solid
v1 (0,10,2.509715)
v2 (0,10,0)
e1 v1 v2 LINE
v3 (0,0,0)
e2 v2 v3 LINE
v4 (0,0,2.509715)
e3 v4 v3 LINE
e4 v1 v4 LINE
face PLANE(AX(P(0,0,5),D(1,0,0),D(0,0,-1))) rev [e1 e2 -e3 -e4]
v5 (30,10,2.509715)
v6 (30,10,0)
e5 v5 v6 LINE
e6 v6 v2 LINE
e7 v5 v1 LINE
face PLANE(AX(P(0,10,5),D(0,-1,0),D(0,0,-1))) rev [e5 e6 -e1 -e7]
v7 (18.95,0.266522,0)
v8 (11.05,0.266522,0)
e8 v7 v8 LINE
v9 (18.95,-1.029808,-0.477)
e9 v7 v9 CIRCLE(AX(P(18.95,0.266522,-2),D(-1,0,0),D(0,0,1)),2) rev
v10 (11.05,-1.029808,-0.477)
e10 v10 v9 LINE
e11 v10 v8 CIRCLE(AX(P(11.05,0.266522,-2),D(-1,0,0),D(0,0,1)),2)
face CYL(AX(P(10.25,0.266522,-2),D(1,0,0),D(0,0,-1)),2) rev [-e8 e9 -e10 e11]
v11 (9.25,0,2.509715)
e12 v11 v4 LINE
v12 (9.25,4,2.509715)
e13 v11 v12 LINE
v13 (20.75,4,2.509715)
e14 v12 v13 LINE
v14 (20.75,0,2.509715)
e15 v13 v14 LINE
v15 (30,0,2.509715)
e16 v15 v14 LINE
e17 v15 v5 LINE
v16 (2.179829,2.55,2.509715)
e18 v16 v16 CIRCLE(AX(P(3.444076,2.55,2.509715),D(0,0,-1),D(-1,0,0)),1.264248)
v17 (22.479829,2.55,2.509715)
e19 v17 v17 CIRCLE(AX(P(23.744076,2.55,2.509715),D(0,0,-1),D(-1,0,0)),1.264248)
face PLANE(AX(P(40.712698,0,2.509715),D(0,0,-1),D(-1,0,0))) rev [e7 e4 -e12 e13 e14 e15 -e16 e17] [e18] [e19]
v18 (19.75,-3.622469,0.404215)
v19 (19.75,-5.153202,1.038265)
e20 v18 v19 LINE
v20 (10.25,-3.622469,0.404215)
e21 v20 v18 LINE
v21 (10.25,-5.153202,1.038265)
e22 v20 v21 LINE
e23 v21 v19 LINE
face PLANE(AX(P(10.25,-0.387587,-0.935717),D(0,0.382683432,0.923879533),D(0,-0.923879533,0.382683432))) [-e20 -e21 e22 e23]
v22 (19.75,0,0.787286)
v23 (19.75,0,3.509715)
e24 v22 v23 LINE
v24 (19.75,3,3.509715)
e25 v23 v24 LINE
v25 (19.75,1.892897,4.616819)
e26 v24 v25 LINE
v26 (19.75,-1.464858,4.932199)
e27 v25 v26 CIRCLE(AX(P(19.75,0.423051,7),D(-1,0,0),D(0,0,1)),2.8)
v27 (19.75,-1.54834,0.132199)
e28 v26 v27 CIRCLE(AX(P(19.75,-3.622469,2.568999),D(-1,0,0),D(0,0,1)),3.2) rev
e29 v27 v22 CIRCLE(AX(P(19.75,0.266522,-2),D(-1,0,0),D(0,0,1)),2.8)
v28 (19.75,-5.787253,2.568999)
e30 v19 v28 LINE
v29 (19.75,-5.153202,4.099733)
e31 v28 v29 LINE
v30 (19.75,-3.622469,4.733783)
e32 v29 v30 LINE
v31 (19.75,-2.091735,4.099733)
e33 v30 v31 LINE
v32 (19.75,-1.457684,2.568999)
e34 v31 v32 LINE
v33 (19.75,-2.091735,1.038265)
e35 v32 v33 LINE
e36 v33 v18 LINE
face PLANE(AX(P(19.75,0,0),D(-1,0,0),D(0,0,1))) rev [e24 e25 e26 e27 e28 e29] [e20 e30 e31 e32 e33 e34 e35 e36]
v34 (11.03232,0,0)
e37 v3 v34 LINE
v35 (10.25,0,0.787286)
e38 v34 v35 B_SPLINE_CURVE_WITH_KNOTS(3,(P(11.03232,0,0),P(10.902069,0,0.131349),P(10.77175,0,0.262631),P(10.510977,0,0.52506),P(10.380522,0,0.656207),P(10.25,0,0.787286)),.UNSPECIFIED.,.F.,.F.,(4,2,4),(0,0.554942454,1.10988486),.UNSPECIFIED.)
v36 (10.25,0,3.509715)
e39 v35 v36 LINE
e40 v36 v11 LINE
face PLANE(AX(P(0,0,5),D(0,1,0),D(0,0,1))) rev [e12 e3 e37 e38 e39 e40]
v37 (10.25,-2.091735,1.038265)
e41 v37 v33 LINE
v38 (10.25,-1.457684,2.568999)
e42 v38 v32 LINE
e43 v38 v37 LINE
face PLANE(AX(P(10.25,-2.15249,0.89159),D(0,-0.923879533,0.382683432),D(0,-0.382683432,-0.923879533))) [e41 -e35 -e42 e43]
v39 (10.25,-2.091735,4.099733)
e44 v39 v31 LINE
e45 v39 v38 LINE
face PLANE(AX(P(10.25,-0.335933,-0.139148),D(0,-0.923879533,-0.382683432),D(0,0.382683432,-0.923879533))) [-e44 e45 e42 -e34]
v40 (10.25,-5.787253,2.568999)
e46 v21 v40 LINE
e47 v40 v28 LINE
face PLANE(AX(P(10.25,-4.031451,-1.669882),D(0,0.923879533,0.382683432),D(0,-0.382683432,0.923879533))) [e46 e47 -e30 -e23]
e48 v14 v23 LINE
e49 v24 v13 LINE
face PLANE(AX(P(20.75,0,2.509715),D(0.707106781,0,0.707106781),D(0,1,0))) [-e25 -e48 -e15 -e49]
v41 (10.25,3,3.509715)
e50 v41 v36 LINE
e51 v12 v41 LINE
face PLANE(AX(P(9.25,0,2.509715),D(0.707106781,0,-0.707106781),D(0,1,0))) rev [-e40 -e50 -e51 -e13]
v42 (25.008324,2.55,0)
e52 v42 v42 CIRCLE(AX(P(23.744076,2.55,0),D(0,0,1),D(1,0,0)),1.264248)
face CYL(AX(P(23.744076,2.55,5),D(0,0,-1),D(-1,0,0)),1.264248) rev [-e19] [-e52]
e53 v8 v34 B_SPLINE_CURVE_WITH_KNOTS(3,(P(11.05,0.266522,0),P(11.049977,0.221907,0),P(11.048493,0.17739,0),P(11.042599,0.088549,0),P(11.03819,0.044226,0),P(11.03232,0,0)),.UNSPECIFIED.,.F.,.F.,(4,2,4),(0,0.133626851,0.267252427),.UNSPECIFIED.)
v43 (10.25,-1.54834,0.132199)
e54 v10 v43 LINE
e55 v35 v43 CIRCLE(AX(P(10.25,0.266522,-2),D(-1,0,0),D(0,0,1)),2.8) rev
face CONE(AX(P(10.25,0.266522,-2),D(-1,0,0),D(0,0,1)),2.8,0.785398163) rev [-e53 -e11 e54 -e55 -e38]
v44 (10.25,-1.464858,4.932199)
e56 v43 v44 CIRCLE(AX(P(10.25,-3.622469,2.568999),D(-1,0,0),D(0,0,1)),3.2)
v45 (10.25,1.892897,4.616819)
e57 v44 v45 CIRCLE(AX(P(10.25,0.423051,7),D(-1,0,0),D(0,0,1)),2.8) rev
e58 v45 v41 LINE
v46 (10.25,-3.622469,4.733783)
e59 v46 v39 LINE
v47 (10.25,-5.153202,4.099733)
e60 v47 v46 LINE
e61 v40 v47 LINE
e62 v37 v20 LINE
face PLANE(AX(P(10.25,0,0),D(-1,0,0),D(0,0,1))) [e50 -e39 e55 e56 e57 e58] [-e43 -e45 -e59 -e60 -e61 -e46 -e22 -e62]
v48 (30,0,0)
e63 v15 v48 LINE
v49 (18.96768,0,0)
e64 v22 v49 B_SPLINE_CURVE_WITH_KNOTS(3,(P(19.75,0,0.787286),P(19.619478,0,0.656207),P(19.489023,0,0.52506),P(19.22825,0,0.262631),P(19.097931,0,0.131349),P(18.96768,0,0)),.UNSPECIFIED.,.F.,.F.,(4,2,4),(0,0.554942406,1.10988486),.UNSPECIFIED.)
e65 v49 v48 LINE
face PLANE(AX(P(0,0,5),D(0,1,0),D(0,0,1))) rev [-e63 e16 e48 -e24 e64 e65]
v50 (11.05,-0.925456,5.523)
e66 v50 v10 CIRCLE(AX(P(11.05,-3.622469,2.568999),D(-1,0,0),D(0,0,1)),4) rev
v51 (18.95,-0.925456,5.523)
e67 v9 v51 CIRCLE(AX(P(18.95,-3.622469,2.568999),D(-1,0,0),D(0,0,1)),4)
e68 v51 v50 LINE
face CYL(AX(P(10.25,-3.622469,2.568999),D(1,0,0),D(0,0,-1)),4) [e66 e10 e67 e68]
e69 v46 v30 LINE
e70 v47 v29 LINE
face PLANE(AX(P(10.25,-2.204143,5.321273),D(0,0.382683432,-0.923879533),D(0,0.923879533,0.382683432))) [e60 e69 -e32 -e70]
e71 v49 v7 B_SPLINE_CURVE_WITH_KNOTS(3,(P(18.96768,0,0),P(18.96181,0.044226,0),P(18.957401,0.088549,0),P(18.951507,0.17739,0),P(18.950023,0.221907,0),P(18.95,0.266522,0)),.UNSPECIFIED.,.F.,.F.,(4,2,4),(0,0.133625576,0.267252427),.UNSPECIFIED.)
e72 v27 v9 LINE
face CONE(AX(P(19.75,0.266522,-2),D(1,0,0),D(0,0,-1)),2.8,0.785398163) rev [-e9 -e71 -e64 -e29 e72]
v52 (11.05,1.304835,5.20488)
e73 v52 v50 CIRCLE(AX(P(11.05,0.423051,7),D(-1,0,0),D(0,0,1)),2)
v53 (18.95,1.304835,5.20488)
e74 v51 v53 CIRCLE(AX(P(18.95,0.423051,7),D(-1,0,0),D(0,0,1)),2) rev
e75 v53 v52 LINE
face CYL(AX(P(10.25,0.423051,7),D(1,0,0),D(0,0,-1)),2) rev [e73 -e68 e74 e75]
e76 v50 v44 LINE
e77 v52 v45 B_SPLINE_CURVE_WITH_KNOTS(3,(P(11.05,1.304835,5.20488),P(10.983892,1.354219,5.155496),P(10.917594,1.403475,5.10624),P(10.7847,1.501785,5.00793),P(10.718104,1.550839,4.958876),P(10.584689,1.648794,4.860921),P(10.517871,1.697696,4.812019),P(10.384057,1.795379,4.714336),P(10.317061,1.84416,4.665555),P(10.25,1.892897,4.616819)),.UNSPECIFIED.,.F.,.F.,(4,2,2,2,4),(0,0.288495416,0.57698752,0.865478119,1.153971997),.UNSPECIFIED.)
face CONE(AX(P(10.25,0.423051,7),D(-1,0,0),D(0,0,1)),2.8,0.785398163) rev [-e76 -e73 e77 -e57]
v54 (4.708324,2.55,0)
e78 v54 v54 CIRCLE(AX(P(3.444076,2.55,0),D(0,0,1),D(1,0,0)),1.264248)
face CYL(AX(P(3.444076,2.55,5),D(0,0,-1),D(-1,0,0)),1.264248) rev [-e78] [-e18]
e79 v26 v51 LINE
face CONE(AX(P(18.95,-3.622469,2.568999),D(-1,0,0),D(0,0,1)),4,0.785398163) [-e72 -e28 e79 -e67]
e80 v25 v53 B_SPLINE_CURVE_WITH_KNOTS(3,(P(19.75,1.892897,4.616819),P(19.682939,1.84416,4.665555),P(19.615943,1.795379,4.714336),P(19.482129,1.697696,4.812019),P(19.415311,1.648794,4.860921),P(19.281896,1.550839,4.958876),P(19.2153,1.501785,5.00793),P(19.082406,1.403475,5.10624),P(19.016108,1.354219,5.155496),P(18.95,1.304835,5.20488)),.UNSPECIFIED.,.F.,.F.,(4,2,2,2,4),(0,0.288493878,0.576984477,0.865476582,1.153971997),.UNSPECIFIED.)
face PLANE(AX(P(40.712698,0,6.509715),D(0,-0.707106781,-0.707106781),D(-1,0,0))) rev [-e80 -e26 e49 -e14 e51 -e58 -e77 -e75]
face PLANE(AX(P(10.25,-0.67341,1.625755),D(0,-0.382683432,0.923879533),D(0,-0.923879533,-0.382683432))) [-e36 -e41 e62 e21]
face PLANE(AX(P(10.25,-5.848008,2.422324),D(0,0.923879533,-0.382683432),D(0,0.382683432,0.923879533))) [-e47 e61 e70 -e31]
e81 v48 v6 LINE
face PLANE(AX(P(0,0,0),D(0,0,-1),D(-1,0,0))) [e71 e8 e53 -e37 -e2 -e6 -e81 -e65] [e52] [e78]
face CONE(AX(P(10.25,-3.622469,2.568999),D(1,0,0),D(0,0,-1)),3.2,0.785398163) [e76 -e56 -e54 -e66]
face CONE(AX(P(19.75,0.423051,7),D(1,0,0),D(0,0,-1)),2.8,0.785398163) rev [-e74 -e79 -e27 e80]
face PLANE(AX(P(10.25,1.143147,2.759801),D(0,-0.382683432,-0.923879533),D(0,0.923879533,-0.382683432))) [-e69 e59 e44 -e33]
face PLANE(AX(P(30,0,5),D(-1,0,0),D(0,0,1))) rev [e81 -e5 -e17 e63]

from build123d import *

# Parameters (mm, degrees)
SKETCH1_W           = 30
SKETCH1_H           = 10
SKETCH1_R           = 1.264247842
BOSS_EXTRUDE1_DEPTH = 5
SKETCH3_R           = 4
BOSS_EXTRUDE2_DEPTH = 4.75
FILLET1_R           = 2
FILLET2_R           = 2
CHAMFER1_SIZE       = 0.8
CUT_EXTRUDE3_REACH  = 34.298
SKETCH6_W           = 3.842122027
SKETCH6_H           = 10
CHAMFER4_START      = 10.25
CHAMFER4_DEPTH      = 9.5
CHAMFER5_SIZE       = 1


with BuildPart() as part:
    # Sketch1 → Boss-Extrude1 (new body)
    with BuildSketch(Plane.XY):
        with Locations((15, 5)):
            Rectangle(SKETCH1_W, SKETCH1_H)
        with Locations((3.444076375, 2.55)):
            Circle(SKETCH1_R, mode=Mode.SUBTRACT)
        with Locations((23.744076375, 2.55)):
            Circle(SKETCH1_R, mode=Mode.SUBTRACT)
    extrude(amount=BOSS_EXTRUDE1_DEPTH)

    # Sketch3 → Boss-Extrude2 (add, symmetric)
    with BuildSketch(Plane.ZY.offset(-15)):
        with Locations((2.568998912, -3.622468738)):
            Circle(SKETCH3_R)
        Polygon((0.404214511, -3.622468738), (1.038265182, -5.153202468), (2.568998912, -5.787253139), (4.099732641, -5.153202468), (4.733783312, -3.622468738), (4.099732641, -2.091735009), (2.568998912, -1.457684338), (1.038265182, -2.091735009), align=None, mode=Mode.SUBTRACT)
    extrude(amount=BOSS_EXTRUDE2_DEPTH, both=True)

    # Fillet1
    # the kernel refuses this fillet: 2 mm, written as the material it adds along each edge
    with BuildSketch(Plane(origin=(19.75, 0, 0.872614451), x_dir=(0, 0, -1), z_dir=(-1, 0, 0))) as fillet1_piece_1:
        with BuildLine():
            CenterArc((2.851261839, -0.291469576), FILLET1_R, 139.283020083, 32.337148469)
            ThreePointArc((1.335379739, 1.013176529), (0.721358104, 0.435852839), (0, 0))
            Line((0, 0), (0.872614451, 0))
        make_face()
    extrude(amount=9.5)
    with BuildSketch(Plane(origin=(19.75, 0, 4.265383373), x_dir=(0, 0, 1), z_dir=(-1, 0, 0))) as fillet1_piece_2:
        with BuildLine():
            CenterArc((2.674069858, 0.488386288), FILLET1_R, 194.13415607, 29.112659272)
            ThreePointArc((1.217251752, -0.881898721), (0.650423795, -0.383257259), (0, 0))
            Line((0, 0), (0.734616627, 0))
        make_face()
    extrude(amount=9.5)

    # Fillet2
    # the kernel refuses this fillet: 2 mm, written as the material it adds along each edge
    with BuildSketch(Plane(origin=(19.75, 0, 0), x_dir=(0, 1, 0), z_dir=(-1, 0, 0))) as fillet2_piece_1:
        with BuildLine():
            CenterArc((0.266521997, 2), FILLET2_R, 229.596597584, 40.403402416)
            Line((-1.029808248, 0.477000363), (-1.159441272, 0.324700399))
            ThreePointArc((-1.159441272, 0.324700399), (-1.143641139, 0.311177078), (-0.029146958, -0.197864739))
            Line((-0.029146958, -0.197864739), (0, -0.2))
            Line((0, -0.2), (0.266521997, -0.2))
            Line((0.266521997, -0.2), (0.266521997, 0))
        make_face()
    extrude(amount=9.5)
    with BuildSketch(Plane(origin=(19.75, 0, 5), x_dir=(0, -0.870596677984774, 0.491997382393317), z_dir=(-1, 0, 0))) as fillet2_piece_2:
        with BuildLine():
            CenterArc((0.615688034, 1.949333304), FILLET2_R, 240.528051524, 42.396189725)
            Line((-0.368306731, 0.208139948), (-0.466706207, 0.034020613))
            Line((-0.466706207, 0.034020613), (-0.098399476, -0.174119336))
            Line((-0.098399476, -0.174119336), (-0.052901843, -0.192876631))
            ThreePointArc((-0.052901843, -0.192876631), (1.052854803, -0.20795909), (1.10774555, -0.19493333))
            Line((1.10774555, -0.19493333), (1.063013048, 0))
        make_face()
    extrude(amount=9.5)

    # Chamfer1
    # the kernel refuses this chamfer: 0.8 mm, written as the material it takes off along each edge
    with BuildSketch(Plane(origin=(19.75, 0.266521997, -2), x_dir=(0, -0.648165122631187, 0.7614998186503384), z_dir=(0, -0.7614998186503384, -0.648165122631187))) as chamfer1_piece_1_section:
        Polygon((2, CHAMFER1_SIZE), (2 + CHAMFER1_SIZE, 0), (2, 0), align=None)
    chamfer1_piece_1 = revolve(axis=Axis((19.75, 0.266521997, -2), (-1, 0, 0)), revolution_arc=99.346805501, mode=Mode.PRIVATE)
    chamfer1_piece_1 = split(chamfer1_piece_1, bisect_by=Plane(origin=(19.75, 0, -2), z_dir=(0, -1, 0)), keep=Keep.TOP, mode=Mode.PRIVATE)
    add(chamfer1_piece_1, mode=Mode.SUBTRACT)
    with BuildSketch(Plane(origin=(19.75, 0.266521997, -2), x_dir=(0, -0.648165122631187, 0.7614998186503384), z_dir=(0, -0.7614998186503384, -0.648165122631187))) as chamfer1_piece_2_section:
        Polygon((2, CHAMFER1_SIZE), (2 + CHAMFER1_SIZE, 0), (2, 0), align=None)
    chamfer1_piece_2 = revolve(axis=Axis((19.75, 0.266521997, -2), (-1, 0, 0)), revolution_arc=99.346805501, mode=Mode.PRIVATE)
    chamfer1_piece_2 = split(chamfer1_piece_2, bisect_by=Plane(origin=(19.75, 0.266521997, 0), z_dir=(0, 0, -1)), keep=Keep.TOP, mode=Mode.PRIVATE)
    add(chamfer1_piece_2, mode=Mode.SUBTRACT)
    with BuildSketch(Plane(origin=(19.75, 0.423050926, 7), x_dir=(0, 0.8566624684959867, -0.515877325602088), z_dir=(0, 0.515877325602088, 0.8566624684959867))) as chamfer1_piece_3_section:
        Polygon((2, CHAMFER1_SIZE), (2 + CHAMFER1_SIZE, 0), (2, 0), align=None)
    chamfer1_piece_3 = revolve(axis=Axis((19.75, 0.423050926, 7), (-1, 0, 0)), revolution_arc=101.340075028, mode=Mode.PRIVATE)
    chamfer1_piece_3 = split(chamfer1_piece_3, bisect_by=Plane(origin=(19.75, 0, 7), z_dir=(0, -1, 0)), keep=Keep.TOP, mode=Mode.PRIVATE)
    add(chamfer1_piece_3, mode=Mode.SUBTRACT)
    with BuildSketch(Plane(origin=(19.75, 0.423050926, 7), x_dir=(0, 0.8566624684959867, -0.515877325602088), z_dir=(0, 0.515877325602088, 0.8566624684959867))) as chamfer1_piece_4_section:
        Polygon((2, CHAMFER1_SIZE), (2 + CHAMFER1_SIZE, 0), (2, 0), align=None)
    chamfer1_piece_4 = revolve(axis=Axis((19.75, 0.423050926, 7), (-1, 0, 0)), revolution_arc=101.340075028, mode=Mode.PRIVATE)
    chamfer1_piece_4 = split(chamfer1_piece_4, bisect_by=Plane(origin=(19.75, 0.423050926, 5), z_dir=(0, 0, 1)), keep=Keep.TOP, mode=Mode.PRIVATE)
    add(chamfer1_piece_4, mode=Mode.SUBTRACT)
    with BuildSketch(Plane(origin=(19.75, -3.622468738, 2.568998912), x_dir=(0, 0.6742532774459821, 0.7385001813495726), z_dir=(0, 0.7385001813495726, -0.6742532774459821))) as chamfer1_piece_5:
        Polygon((4 - CHAMFER1_SIZE, 0), (4, -CHAMFER1_SIZE), (4, 0), align=None)
    revolve(axis=Axis((19.75, -3.622468738, 2.568998912), (1, 0, 0)), revolution_arc=262.799592141, mode=Mode.SUBTRACT)
    with BuildSketch(Plane(origin=(10.25, 0.266521997, -2), x_dir=(0, -0.648165122631187, 0.7614998186503384), z_dir=(0, -0.7614998186503384, -0.648165122631187))) as chamfer1_piece_6_section:
        Polygon((2 + CHAMFER1_SIZE, 0), (2, -CHAMFER1_SIZE), (2, 0), align=None)
    chamfer1_piece_6 = revolve(axis=Axis((10.25, 0.266521997, -2), (-1, 0, 0)), revolution_arc=99.346805501, mode=Mode.PRIVATE)
    chamfer1_piece_6 = split(chamfer1_piece_6, bisect_by=Plane(origin=(10.25, 0, -2), z_dir=(0, -1, 0)), keep=Keep.TOP, mode=Mode.PRIVATE)
    add(chamfer1_piece_6, mode=Mode.SUBTRACT)
    with BuildSketch(Plane(origin=(10.25, 0.266521997, -2), x_dir=(0, -0.648165122631187, 0.7614998186503384), z_dir=(0, -0.7614998186503384, -0.648165122631187))) as chamfer1_piece_7_section:
        Polygon((2 + CHAMFER1_SIZE, 0), (2, -CHAMFER1_SIZE), (2, 0), align=None)
    chamfer1_piece_7 = revolve(axis=Axis((10.25, 0.266521997, -2), (-1, 0, 0)), revolution_arc=99.346805501, mode=Mode.PRIVATE)
    chamfer1_piece_7 = split(chamfer1_piece_7, bisect_by=Plane(origin=(10.25, 0.266521997, 0), z_dir=(0, 0, -1)), keep=Keep.TOP, mode=Mode.PRIVATE)
    add(chamfer1_piece_7, mode=Mode.SUBTRACT)
    with BuildSketch(Plane(origin=(10.25, 0.423050926, 7), x_dir=(0, 0.8566624684959867, -0.515877325602088), z_dir=(0, 0.515877325602088, 0.8566624684959867))) as chamfer1_piece_8_section:
        Polygon((2, -CHAMFER1_SIZE), (2 + CHAMFER1_SIZE, 0), (2, 0), align=None)
    chamfer1_piece_8 = revolve(axis=Axis((10.25, 0.423050926, 7), (-1, 0, 0)), revolution_arc=101.340075028, mode=Mode.PRIVATE)
    chamfer1_piece_8 = split(chamfer1_piece_8, bisect_by=Plane(origin=(10.25, 0, 7), z_dir=(0, -1, 0)), keep=Keep.TOP, mode=Mode.PRIVATE)
    add(chamfer1_piece_8, mode=Mode.SUBTRACT)
    with BuildSketch(Plane(origin=(10.25, 0.423050926, 7), x_dir=(0, 0.8566624684959867, -0.515877325602088), z_dir=(0, 0.515877325602088, 0.8566624684959867))) as chamfer1_piece_9_section:
        Polygon((2, -CHAMFER1_SIZE), (2 + CHAMFER1_SIZE, 0), (2, 0), align=None)
    chamfer1_piece_9 = revolve(axis=Axis((10.25, 0.423050926, 7), (-1, 0, 0)), revolution_arc=101.340075028, mode=Mode.PRIVATE)
    chamfer1_piece_9 = split(chamfer1_piece_9, bisect_by=Plane(origin=(10.25, 0.423050926, 5), z_dir=(0, 0, 1)), keep=Keep.TOP, mode=Mode.PRIVATE)
    add(chamfer1_piece_9, mode=Mode.SUBTRACT)
    with BuildSketch(Plane(origin=(10.25, -3.622468738, 2.568998912), x_dir=(0, 0.6742532774459821, 0.7385001813495726), z_dir=(0, 0.7385001813495726, -0.6742532774459821))) as chamfer1_piece_10:
        Polygon((4 - CHAMFER1_SIZE, 0), (4, CHAMFER1_SIZE), (4, 0), align=None)
    revolve(axis=Axis((10.25, -3.622468738, 2.568998912), (1, 0, 0)), revolution_arc=262.799592141, mode=Mode.SUBTRACT)

    # Cut-Extrude3: up to this face of the body (flat: up to its plane)
    cut_extrude3_end = Plane(part.part.faces().sort_by_distance((30, 5, 2.5))[0])
    # Sketch6 → Cut-Extrude3 (cut, up to the picked face)
    with BuildSketch(Plane(origin=(0, 0, 0), x_dir=(0, 0, -1), z_dir=(1, 0, 0)), mode=Mode.PRIVATE) as cut_extrude3_sk1:
        with Locations((-4.430776166, 5)):
            Rectangle(SKETCH6_W, SKETCH6_H)
    cut_extrude3_tool1 = split(extrude(cut_extrude3_sk1.sketch, amount=CUT_EXTRUDE3_REACH, mode=Mode.PRIVATE), bisect_by=cut_extrude3_end, keep=Keep.BOTH, mode=Mode.PRIVATE)
    add(cut_extrude3_tool1.solids().sort_by(Axis((0, 5, 4.430776), (1, 0, 0)))[0], mode=Mode.SUBTRACT)

    # Chamfer4: read off the stored shape, not the designer's step
    # Chamfer4 outline → Chamfer4 (add)
    with BuildSketch(Plane.YZ.offset(CHAMFER4_START)):
        with BuildLine():
            ThreePointArc((1.304835295, 5.204879857), (0.665907086, 5.014799535), (0, 5.045255026))
            Line((0, 5.045255026), (0, 2.509715152))
            Line((0, 2.509715152), (4, 2.509715152))
            Line((4, 2.509715152), (1.304835295, 5.204879857))
        make_face()
    extrude(amount=CHAMFER4_DEPTH)

    # Chamfer4 2 outline → Chamfer4 2 (revolve, cut)
    with BuildSketch(Plane(origin=(0, 0.423050926, 7), x_dir=(0, 1, 0), z_dir=(0, 0, -1))):
        Polygon((2, 19.75), (2, 18.95), (2.8, 19.75), align=None)
        Polygon((2.8, 10.25), (2, 11.05), (2, 10.25), align=None)
    revolve(axis=Axis((0, 0.423050926, 7), (1, 0, 0)), mode=Mode.SUBTRACT)

    # Chamfer5
    chamfer5_edges = [part.edges().sort_by_distance(p)[0] for p in [
        (19.75, 2, 2.509715152),
        (10.25, 2, 2.509715152),
    ]]
    chamfer(chamfer5_edges, length=CHAMFER5_SIZE)


solid = part.part
